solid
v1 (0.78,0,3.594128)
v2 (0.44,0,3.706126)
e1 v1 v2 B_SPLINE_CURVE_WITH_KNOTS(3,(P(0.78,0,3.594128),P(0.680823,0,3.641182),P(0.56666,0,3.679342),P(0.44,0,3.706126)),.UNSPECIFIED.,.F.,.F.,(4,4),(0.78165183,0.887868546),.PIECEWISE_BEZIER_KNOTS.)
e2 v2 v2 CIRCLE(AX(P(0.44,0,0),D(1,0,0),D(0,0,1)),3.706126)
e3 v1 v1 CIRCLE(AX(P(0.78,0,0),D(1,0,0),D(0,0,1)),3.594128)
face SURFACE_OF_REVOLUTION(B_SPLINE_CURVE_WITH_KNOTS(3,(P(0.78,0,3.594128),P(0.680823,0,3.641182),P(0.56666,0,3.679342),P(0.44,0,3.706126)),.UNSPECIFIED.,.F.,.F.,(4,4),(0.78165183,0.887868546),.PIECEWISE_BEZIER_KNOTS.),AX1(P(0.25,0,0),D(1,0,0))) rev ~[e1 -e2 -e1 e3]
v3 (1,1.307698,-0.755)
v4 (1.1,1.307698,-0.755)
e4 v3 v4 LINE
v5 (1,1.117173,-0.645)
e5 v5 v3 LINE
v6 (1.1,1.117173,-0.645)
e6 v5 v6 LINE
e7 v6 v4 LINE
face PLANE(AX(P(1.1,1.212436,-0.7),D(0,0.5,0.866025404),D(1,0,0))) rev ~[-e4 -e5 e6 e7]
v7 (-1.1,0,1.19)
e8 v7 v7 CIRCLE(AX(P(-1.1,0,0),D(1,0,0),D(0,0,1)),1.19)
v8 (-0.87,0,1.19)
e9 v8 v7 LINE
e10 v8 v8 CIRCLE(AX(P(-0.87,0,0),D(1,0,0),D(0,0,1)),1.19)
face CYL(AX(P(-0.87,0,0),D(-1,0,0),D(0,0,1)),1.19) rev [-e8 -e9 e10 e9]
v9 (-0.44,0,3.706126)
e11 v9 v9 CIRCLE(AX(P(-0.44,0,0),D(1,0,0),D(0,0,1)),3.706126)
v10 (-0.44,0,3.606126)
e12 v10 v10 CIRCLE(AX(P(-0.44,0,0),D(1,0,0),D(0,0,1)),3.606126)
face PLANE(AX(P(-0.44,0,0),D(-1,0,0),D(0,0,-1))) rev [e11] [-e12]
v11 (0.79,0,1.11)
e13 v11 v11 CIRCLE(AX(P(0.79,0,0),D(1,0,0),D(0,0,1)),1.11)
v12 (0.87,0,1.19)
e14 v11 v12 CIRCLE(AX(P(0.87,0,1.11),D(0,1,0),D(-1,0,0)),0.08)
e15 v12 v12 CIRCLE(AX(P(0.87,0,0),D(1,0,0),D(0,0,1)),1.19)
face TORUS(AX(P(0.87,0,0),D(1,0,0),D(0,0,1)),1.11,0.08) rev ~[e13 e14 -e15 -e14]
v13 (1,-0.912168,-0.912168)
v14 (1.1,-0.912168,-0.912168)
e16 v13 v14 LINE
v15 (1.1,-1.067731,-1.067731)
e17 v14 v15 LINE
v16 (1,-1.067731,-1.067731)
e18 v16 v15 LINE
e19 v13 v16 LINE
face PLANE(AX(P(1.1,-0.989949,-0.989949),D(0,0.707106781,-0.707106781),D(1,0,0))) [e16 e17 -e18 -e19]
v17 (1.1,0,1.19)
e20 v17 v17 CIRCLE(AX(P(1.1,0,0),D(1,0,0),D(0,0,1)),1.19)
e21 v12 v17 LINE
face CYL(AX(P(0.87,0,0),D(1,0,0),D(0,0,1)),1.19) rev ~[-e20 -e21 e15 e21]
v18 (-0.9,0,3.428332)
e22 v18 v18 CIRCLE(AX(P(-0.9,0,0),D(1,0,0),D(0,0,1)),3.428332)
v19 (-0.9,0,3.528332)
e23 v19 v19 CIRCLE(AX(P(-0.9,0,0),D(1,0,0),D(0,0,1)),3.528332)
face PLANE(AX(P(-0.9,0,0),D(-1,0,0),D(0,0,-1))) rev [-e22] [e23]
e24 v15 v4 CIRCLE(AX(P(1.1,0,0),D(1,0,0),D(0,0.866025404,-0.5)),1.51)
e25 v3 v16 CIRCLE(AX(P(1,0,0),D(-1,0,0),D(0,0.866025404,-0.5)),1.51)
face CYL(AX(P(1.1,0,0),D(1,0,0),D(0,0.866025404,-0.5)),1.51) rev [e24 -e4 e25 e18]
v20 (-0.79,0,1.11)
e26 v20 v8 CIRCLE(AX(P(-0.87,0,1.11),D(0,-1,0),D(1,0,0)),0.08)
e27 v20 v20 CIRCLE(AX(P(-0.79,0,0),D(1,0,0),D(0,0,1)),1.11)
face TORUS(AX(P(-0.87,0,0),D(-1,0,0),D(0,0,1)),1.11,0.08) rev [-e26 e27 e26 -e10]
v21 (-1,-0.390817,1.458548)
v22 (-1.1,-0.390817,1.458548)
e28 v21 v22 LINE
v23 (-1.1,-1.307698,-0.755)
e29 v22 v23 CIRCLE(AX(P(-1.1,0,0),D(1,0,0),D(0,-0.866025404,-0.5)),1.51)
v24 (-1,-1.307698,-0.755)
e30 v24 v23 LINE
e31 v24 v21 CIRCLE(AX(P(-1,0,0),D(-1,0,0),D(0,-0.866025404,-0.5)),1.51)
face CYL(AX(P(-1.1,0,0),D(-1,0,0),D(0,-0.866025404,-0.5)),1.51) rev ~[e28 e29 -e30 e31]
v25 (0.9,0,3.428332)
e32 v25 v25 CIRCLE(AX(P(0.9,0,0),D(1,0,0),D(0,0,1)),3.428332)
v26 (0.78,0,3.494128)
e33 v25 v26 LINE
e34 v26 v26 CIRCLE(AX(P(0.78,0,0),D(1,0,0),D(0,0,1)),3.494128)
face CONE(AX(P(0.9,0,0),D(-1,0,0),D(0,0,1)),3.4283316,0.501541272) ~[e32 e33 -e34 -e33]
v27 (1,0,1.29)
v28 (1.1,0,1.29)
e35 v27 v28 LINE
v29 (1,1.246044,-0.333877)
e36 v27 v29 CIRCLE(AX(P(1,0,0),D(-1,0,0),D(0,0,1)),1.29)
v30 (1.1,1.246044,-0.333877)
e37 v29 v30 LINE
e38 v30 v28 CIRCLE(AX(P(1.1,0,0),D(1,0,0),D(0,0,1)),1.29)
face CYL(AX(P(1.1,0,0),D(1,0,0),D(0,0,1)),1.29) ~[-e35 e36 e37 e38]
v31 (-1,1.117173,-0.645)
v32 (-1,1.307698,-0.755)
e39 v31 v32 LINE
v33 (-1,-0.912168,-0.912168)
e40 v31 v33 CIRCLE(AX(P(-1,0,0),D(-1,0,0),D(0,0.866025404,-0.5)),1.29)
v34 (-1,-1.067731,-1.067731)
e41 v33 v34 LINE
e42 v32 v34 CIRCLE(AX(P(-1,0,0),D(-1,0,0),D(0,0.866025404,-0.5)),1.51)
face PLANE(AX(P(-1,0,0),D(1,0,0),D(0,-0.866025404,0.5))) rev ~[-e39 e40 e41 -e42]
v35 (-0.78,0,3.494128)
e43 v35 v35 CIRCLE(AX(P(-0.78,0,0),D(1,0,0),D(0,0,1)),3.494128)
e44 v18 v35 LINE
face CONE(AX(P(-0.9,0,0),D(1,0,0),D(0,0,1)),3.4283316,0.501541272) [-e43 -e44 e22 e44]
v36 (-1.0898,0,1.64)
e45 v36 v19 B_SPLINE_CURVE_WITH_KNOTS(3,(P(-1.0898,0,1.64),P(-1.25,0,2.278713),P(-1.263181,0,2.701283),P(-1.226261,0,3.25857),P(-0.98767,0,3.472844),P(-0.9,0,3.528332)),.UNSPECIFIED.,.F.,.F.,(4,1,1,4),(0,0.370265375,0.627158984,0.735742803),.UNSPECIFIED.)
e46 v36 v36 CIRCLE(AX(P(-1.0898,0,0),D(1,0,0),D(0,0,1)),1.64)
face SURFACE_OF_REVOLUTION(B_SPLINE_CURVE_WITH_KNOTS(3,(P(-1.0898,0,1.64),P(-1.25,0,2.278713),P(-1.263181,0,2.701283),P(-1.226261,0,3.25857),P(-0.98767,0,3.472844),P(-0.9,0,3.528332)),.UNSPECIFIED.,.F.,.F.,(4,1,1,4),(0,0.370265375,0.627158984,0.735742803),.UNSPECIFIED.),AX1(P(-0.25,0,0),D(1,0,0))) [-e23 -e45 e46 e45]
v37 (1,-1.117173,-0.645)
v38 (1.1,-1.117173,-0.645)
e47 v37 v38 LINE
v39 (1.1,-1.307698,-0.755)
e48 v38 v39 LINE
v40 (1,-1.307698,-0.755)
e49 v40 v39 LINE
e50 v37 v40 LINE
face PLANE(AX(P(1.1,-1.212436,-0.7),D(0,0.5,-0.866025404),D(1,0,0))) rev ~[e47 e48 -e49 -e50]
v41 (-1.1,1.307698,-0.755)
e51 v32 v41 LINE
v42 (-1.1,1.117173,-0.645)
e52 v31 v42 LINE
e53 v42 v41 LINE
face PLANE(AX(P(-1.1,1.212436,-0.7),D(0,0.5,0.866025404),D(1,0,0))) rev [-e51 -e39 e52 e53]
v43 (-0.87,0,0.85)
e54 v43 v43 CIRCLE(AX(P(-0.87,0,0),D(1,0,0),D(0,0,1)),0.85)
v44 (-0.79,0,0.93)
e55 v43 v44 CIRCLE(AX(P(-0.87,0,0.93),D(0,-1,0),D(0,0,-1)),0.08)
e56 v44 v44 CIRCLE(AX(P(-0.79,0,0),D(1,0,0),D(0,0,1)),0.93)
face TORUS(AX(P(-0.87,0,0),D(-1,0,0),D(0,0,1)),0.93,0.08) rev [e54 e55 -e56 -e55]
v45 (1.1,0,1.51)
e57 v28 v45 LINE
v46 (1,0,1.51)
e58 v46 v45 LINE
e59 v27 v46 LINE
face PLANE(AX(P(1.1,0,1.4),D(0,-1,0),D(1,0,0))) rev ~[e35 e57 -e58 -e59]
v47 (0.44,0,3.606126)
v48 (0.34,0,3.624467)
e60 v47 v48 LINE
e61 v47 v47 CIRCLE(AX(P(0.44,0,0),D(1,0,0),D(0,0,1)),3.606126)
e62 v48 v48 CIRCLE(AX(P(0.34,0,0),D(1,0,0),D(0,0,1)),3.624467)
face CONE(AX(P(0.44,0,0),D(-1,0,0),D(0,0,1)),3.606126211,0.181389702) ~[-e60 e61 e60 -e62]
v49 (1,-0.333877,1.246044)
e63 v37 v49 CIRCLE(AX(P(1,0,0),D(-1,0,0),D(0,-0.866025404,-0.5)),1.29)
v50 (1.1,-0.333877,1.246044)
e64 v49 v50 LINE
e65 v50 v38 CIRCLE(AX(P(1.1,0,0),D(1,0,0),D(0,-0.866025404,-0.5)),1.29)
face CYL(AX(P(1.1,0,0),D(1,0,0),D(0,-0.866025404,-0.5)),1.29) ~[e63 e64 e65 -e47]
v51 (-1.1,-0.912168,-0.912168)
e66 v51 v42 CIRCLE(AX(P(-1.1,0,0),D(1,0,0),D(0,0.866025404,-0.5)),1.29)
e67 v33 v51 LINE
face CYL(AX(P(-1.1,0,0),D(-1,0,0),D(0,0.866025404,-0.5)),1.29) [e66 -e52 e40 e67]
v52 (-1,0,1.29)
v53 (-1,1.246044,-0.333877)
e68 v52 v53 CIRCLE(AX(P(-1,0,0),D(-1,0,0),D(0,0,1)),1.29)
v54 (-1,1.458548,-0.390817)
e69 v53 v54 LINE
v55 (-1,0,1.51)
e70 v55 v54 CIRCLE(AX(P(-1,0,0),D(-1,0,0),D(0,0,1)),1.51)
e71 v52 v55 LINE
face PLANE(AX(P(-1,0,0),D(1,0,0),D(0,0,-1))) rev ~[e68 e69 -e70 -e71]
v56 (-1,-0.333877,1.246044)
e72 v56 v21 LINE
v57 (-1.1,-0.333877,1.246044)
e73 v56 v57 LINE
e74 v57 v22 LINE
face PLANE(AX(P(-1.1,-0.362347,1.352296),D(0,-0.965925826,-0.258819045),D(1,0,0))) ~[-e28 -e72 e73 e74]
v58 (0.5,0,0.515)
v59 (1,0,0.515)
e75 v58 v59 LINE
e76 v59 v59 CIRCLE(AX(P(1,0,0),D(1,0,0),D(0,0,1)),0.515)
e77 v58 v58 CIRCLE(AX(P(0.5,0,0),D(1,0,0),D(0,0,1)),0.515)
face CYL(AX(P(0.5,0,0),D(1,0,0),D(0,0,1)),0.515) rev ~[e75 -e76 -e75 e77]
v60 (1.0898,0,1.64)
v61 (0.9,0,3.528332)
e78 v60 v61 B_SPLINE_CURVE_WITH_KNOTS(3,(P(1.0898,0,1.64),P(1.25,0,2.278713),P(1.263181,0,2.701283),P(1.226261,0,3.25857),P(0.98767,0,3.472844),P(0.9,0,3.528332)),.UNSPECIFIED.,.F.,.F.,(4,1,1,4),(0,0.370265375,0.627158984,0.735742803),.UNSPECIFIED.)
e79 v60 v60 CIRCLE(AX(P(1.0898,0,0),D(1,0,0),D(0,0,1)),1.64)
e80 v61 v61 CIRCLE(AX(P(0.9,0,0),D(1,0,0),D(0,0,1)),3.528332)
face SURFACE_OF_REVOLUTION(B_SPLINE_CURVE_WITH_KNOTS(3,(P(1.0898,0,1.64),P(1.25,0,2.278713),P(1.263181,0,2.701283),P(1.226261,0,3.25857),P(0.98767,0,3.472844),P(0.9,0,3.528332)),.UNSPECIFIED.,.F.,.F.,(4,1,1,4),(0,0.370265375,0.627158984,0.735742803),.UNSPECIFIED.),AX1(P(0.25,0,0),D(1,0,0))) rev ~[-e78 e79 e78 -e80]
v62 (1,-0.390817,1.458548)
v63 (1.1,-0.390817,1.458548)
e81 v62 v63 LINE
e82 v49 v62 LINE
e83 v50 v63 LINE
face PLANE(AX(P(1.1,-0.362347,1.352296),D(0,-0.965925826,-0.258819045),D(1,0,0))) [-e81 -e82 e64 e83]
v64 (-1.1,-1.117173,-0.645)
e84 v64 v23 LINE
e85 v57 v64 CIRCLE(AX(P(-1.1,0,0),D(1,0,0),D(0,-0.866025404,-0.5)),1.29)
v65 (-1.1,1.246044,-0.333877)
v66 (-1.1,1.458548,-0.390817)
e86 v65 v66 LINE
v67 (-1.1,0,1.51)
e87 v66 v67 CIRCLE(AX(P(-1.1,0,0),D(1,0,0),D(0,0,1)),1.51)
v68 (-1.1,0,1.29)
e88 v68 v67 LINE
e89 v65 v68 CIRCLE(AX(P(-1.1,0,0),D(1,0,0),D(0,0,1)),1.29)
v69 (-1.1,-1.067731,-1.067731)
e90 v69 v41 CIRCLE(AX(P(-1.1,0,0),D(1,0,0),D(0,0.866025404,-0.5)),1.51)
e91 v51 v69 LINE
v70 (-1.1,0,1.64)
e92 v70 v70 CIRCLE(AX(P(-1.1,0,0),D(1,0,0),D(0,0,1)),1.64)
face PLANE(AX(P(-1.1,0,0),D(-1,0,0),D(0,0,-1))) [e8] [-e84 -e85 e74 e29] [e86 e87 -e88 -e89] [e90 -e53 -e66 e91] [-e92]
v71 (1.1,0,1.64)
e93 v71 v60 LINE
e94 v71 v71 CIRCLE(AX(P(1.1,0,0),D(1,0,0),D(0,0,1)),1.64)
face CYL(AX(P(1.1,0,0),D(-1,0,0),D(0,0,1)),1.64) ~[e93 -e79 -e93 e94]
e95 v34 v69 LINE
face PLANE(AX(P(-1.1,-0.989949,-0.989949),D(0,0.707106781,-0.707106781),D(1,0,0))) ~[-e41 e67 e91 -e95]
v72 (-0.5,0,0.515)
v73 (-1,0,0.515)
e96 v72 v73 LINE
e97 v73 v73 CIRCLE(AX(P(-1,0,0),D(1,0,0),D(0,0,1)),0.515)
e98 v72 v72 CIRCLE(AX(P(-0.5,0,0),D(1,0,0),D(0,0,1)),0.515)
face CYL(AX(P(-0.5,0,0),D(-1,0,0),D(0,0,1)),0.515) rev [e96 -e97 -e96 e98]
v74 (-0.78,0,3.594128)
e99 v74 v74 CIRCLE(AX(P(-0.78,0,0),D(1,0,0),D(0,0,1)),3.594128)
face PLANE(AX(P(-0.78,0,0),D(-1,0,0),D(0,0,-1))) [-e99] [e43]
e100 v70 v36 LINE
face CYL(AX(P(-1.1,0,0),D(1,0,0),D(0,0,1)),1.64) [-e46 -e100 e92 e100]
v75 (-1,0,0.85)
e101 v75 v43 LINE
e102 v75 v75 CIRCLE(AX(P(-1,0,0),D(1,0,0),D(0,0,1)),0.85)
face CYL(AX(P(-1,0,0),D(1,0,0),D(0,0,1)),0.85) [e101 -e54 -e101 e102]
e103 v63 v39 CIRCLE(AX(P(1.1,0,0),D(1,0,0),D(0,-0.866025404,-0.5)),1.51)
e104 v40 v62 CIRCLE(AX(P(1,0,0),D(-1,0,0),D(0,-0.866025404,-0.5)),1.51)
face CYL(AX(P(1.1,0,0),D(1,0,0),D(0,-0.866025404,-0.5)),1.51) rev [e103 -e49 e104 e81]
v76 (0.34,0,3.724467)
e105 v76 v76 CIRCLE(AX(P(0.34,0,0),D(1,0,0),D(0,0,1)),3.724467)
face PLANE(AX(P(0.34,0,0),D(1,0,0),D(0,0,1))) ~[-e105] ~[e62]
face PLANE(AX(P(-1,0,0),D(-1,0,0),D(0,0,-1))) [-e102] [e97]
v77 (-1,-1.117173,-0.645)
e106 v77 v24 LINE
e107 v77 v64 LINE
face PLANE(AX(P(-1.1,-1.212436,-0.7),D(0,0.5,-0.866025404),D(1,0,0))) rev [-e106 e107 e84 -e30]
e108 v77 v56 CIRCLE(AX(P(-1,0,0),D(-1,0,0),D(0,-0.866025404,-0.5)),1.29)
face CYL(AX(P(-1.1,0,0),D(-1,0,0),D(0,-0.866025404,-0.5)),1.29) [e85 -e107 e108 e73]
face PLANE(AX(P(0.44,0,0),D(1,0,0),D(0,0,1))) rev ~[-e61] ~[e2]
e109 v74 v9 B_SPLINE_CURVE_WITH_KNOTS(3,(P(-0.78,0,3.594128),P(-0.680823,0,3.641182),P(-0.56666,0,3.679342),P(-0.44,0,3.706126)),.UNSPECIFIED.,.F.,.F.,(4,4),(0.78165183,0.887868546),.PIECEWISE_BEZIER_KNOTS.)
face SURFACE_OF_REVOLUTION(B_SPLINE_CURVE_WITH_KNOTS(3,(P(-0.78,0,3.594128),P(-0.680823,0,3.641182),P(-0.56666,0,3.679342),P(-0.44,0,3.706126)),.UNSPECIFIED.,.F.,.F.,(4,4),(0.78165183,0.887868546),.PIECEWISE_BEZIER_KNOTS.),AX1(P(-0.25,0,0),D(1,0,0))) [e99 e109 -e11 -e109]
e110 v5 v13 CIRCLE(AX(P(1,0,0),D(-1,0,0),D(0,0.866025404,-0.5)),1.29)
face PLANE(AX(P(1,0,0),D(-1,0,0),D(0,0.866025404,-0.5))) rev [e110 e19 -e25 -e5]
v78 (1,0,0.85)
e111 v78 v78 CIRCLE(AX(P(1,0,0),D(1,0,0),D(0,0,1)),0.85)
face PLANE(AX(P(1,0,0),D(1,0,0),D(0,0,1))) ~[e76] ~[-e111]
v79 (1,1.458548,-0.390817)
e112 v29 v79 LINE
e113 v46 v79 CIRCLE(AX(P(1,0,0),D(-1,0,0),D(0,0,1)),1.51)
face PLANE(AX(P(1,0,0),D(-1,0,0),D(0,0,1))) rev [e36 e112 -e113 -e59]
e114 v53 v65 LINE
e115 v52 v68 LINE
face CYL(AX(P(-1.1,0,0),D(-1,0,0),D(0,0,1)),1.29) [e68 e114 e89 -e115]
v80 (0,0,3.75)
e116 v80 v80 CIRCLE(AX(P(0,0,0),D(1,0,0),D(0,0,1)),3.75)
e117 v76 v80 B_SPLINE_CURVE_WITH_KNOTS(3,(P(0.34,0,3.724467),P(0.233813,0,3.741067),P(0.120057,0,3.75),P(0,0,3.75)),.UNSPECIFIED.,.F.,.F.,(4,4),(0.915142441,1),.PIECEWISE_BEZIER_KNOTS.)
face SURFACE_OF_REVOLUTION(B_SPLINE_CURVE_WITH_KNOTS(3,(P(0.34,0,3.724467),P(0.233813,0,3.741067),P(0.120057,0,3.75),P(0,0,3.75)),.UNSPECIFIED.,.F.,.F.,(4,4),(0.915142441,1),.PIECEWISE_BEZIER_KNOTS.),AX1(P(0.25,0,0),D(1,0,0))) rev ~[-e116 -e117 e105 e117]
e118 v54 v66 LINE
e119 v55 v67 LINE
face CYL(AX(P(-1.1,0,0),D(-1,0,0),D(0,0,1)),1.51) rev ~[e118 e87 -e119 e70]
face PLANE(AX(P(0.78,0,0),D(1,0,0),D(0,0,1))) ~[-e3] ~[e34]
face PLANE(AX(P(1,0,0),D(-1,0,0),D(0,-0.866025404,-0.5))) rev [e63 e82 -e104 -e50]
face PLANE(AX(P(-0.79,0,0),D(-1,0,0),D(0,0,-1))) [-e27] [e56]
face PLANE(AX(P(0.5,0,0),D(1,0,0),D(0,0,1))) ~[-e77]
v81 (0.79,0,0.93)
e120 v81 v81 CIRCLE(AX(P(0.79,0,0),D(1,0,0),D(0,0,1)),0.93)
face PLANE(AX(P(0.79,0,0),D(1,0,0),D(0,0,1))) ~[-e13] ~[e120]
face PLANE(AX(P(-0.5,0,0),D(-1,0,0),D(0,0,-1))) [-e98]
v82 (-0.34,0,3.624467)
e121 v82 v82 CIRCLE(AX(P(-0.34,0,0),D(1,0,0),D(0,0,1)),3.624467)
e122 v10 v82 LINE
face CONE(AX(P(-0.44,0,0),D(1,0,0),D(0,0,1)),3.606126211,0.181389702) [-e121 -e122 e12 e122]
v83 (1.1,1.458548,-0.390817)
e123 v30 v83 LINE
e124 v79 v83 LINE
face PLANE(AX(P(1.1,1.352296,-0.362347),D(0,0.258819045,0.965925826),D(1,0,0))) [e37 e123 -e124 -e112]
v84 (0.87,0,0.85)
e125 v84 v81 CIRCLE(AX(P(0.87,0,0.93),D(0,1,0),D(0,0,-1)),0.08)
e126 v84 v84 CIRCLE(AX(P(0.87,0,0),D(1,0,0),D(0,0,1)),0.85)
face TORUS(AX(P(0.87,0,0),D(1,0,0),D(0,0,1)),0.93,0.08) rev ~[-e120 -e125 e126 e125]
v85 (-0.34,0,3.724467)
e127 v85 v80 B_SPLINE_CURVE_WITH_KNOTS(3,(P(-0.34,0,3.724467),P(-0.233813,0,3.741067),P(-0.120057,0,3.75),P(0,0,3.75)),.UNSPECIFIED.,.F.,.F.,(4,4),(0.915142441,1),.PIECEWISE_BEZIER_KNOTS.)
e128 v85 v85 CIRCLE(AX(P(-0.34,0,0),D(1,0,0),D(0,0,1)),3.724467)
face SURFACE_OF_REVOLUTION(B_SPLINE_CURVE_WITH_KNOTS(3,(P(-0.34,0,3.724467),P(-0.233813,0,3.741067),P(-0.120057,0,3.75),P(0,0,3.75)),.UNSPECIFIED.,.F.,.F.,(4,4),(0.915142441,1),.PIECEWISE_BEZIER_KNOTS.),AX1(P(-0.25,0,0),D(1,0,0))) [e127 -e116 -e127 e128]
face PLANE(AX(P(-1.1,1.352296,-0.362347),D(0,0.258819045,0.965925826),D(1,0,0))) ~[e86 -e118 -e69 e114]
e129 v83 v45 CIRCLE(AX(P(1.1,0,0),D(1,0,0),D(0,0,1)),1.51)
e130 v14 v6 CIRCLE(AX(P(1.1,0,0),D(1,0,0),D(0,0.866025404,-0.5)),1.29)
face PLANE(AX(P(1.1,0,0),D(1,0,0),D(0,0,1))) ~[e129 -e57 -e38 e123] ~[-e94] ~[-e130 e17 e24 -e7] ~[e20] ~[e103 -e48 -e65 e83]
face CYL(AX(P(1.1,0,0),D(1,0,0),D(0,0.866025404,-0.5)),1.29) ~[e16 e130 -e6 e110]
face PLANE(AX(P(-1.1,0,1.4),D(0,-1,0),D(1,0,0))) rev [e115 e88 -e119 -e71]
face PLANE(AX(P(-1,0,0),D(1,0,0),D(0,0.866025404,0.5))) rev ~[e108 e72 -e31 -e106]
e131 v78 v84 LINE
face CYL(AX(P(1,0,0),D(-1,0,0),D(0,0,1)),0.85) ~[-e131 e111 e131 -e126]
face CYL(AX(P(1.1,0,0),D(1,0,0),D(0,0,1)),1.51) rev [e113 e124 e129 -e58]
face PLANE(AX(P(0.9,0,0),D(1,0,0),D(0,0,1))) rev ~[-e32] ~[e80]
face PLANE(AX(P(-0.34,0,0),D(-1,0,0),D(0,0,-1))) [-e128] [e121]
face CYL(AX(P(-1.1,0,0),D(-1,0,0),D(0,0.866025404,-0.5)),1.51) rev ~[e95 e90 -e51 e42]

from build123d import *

# Parameters (mm, degrees)
F2_W            = 0.2
F2_H            = 0.22
F3_ANGLE        = 105
F3_COPIES_COUNT = 3


# Not quite as in the source:
# - a pattern or mirror of a feature is missing from the dataset's text; its kind, count and spacing are read off the source's solid


with BuildPart() as f1:
    # F0 (on Front) → F1 (revolve)
    with BuildSketch(Plane.XZ):
        with BuildLine():
            Line((1, 0.85), (0.87, 0.85))
            ThreePointArc((0.87, 0.85), (0.8134314575, 0.8734314575), (0.79, 0.93))
            Line((0.79, 0.93), (0.79, 1.11))
            ThreePointArc((0.79, 1.11), (0.8134314575, 1.1665685425), (0.87, 1.19))
            Line((0.87, 1.19), (1.1, 1.19))
            Line((1.1, 1.19), (1.1, 1.59))
            Line((1.1, 1.59), (1.1, 1.64))
            Line((1.1, 1.64), (1.0898001841, 1.64))
            add(Edge.make_bspline(
                [(1.0898001841, 1.64), (1.25, 2.278713374), (1.2631809244, 2.7012833679), (1.2262611325, 3.2585699441), (0.9876698715, 3.4728439225), (0.9, 3.5283316002)],
                knots=[0, 0, 0, 0, 0.3702653747, 0.6271589839, 0.7357428034, 0.7357428034, 0.7357428034, 0.7357428034], degree=3))
            Line((0.9, 3.5283316002), (0.9, 3.4283316002))
            Line((0.9, 3.4283316002), (0.78, 3.4941282527))
            Line((0.78, 3.4941282527), (0.78, 3.5941282527))
            add(Edge.make_bspline(
                [(0.78, 3.5941282527), (0.6808228027, 3.641181915), (0.5666603708, 3.6793418914), (0.44, 3.7061262113)],
                knots=[0.7816518304, 0.7816518304, 0.7816518304, 0.7816518304, 0.8878685464, 0.8878685464, 0.8878685464, 0.8878685464], degree=3))
            Line((0.44, 3.7061262113), (0.44, 3.6061262113))
            Line((0.44, 3.6061262113), (0.34, 3.6244667725))
            Line((0.34, 3.6244667725), (0.34, 3.7244667725))
            add(Edge.make_bspline(
                [(0.34, 3.7244667725), (0.2338131535, 3.7410670641), (0.120057055, 3.75), (0, 3.75)],
                knots=[0.9151424409, 0.9151424409, 0.9151424409, 0.9151424409, 1, 1, 1, 1], degree=3))
            Line((0, 3.75), (0, 0.515))
            Line((0, 0.515), (0, 0))
            Line((0, 0), (0.5, 0))
            Line((0.5, 0), (0.5, 0.515))
            Line((0.5, 0.515), (1, 0.515))
            Line((1, 0.515), (1, 0.85))
        make_face()
    revolve(axis=Axis((0.25, 0, 0), (1, 0, 0)))

    # F2 (on Front) → F3 (revolve, cut)
    with BuildSketch(Plane.XZ):
        with Locations((1.1, 1.4)):
            Rectangle(F2_W, F2_H)
    f3 = revolve(axis=Axis((1.36, 0, 0), (-1, 0, 0)), revolution_arc=F3_ANGLE, mode=Mode.SUBTRACT)

    # F3_copies: F3 ×3 about axis
    f3_copies_axis = Axis((0, 0, 0), (1, 0, 0))
    for i in range(1, F3_COPIES_COUNT):
        add(f3.rotate(f3_copies_axis, i * 360 / F3_COPIES_COUNT), mode=Mode.SUBTRACT)

    # F4: F1 across face


with BuildPart() as f1_1:
    add(f1.part)
    add(f1.part.mirror(Plane(origin=(0, 0, 0), x_dir=(0, -1, 0), z_dir=(-1, 0, 0))))


solid = f1_1.part
